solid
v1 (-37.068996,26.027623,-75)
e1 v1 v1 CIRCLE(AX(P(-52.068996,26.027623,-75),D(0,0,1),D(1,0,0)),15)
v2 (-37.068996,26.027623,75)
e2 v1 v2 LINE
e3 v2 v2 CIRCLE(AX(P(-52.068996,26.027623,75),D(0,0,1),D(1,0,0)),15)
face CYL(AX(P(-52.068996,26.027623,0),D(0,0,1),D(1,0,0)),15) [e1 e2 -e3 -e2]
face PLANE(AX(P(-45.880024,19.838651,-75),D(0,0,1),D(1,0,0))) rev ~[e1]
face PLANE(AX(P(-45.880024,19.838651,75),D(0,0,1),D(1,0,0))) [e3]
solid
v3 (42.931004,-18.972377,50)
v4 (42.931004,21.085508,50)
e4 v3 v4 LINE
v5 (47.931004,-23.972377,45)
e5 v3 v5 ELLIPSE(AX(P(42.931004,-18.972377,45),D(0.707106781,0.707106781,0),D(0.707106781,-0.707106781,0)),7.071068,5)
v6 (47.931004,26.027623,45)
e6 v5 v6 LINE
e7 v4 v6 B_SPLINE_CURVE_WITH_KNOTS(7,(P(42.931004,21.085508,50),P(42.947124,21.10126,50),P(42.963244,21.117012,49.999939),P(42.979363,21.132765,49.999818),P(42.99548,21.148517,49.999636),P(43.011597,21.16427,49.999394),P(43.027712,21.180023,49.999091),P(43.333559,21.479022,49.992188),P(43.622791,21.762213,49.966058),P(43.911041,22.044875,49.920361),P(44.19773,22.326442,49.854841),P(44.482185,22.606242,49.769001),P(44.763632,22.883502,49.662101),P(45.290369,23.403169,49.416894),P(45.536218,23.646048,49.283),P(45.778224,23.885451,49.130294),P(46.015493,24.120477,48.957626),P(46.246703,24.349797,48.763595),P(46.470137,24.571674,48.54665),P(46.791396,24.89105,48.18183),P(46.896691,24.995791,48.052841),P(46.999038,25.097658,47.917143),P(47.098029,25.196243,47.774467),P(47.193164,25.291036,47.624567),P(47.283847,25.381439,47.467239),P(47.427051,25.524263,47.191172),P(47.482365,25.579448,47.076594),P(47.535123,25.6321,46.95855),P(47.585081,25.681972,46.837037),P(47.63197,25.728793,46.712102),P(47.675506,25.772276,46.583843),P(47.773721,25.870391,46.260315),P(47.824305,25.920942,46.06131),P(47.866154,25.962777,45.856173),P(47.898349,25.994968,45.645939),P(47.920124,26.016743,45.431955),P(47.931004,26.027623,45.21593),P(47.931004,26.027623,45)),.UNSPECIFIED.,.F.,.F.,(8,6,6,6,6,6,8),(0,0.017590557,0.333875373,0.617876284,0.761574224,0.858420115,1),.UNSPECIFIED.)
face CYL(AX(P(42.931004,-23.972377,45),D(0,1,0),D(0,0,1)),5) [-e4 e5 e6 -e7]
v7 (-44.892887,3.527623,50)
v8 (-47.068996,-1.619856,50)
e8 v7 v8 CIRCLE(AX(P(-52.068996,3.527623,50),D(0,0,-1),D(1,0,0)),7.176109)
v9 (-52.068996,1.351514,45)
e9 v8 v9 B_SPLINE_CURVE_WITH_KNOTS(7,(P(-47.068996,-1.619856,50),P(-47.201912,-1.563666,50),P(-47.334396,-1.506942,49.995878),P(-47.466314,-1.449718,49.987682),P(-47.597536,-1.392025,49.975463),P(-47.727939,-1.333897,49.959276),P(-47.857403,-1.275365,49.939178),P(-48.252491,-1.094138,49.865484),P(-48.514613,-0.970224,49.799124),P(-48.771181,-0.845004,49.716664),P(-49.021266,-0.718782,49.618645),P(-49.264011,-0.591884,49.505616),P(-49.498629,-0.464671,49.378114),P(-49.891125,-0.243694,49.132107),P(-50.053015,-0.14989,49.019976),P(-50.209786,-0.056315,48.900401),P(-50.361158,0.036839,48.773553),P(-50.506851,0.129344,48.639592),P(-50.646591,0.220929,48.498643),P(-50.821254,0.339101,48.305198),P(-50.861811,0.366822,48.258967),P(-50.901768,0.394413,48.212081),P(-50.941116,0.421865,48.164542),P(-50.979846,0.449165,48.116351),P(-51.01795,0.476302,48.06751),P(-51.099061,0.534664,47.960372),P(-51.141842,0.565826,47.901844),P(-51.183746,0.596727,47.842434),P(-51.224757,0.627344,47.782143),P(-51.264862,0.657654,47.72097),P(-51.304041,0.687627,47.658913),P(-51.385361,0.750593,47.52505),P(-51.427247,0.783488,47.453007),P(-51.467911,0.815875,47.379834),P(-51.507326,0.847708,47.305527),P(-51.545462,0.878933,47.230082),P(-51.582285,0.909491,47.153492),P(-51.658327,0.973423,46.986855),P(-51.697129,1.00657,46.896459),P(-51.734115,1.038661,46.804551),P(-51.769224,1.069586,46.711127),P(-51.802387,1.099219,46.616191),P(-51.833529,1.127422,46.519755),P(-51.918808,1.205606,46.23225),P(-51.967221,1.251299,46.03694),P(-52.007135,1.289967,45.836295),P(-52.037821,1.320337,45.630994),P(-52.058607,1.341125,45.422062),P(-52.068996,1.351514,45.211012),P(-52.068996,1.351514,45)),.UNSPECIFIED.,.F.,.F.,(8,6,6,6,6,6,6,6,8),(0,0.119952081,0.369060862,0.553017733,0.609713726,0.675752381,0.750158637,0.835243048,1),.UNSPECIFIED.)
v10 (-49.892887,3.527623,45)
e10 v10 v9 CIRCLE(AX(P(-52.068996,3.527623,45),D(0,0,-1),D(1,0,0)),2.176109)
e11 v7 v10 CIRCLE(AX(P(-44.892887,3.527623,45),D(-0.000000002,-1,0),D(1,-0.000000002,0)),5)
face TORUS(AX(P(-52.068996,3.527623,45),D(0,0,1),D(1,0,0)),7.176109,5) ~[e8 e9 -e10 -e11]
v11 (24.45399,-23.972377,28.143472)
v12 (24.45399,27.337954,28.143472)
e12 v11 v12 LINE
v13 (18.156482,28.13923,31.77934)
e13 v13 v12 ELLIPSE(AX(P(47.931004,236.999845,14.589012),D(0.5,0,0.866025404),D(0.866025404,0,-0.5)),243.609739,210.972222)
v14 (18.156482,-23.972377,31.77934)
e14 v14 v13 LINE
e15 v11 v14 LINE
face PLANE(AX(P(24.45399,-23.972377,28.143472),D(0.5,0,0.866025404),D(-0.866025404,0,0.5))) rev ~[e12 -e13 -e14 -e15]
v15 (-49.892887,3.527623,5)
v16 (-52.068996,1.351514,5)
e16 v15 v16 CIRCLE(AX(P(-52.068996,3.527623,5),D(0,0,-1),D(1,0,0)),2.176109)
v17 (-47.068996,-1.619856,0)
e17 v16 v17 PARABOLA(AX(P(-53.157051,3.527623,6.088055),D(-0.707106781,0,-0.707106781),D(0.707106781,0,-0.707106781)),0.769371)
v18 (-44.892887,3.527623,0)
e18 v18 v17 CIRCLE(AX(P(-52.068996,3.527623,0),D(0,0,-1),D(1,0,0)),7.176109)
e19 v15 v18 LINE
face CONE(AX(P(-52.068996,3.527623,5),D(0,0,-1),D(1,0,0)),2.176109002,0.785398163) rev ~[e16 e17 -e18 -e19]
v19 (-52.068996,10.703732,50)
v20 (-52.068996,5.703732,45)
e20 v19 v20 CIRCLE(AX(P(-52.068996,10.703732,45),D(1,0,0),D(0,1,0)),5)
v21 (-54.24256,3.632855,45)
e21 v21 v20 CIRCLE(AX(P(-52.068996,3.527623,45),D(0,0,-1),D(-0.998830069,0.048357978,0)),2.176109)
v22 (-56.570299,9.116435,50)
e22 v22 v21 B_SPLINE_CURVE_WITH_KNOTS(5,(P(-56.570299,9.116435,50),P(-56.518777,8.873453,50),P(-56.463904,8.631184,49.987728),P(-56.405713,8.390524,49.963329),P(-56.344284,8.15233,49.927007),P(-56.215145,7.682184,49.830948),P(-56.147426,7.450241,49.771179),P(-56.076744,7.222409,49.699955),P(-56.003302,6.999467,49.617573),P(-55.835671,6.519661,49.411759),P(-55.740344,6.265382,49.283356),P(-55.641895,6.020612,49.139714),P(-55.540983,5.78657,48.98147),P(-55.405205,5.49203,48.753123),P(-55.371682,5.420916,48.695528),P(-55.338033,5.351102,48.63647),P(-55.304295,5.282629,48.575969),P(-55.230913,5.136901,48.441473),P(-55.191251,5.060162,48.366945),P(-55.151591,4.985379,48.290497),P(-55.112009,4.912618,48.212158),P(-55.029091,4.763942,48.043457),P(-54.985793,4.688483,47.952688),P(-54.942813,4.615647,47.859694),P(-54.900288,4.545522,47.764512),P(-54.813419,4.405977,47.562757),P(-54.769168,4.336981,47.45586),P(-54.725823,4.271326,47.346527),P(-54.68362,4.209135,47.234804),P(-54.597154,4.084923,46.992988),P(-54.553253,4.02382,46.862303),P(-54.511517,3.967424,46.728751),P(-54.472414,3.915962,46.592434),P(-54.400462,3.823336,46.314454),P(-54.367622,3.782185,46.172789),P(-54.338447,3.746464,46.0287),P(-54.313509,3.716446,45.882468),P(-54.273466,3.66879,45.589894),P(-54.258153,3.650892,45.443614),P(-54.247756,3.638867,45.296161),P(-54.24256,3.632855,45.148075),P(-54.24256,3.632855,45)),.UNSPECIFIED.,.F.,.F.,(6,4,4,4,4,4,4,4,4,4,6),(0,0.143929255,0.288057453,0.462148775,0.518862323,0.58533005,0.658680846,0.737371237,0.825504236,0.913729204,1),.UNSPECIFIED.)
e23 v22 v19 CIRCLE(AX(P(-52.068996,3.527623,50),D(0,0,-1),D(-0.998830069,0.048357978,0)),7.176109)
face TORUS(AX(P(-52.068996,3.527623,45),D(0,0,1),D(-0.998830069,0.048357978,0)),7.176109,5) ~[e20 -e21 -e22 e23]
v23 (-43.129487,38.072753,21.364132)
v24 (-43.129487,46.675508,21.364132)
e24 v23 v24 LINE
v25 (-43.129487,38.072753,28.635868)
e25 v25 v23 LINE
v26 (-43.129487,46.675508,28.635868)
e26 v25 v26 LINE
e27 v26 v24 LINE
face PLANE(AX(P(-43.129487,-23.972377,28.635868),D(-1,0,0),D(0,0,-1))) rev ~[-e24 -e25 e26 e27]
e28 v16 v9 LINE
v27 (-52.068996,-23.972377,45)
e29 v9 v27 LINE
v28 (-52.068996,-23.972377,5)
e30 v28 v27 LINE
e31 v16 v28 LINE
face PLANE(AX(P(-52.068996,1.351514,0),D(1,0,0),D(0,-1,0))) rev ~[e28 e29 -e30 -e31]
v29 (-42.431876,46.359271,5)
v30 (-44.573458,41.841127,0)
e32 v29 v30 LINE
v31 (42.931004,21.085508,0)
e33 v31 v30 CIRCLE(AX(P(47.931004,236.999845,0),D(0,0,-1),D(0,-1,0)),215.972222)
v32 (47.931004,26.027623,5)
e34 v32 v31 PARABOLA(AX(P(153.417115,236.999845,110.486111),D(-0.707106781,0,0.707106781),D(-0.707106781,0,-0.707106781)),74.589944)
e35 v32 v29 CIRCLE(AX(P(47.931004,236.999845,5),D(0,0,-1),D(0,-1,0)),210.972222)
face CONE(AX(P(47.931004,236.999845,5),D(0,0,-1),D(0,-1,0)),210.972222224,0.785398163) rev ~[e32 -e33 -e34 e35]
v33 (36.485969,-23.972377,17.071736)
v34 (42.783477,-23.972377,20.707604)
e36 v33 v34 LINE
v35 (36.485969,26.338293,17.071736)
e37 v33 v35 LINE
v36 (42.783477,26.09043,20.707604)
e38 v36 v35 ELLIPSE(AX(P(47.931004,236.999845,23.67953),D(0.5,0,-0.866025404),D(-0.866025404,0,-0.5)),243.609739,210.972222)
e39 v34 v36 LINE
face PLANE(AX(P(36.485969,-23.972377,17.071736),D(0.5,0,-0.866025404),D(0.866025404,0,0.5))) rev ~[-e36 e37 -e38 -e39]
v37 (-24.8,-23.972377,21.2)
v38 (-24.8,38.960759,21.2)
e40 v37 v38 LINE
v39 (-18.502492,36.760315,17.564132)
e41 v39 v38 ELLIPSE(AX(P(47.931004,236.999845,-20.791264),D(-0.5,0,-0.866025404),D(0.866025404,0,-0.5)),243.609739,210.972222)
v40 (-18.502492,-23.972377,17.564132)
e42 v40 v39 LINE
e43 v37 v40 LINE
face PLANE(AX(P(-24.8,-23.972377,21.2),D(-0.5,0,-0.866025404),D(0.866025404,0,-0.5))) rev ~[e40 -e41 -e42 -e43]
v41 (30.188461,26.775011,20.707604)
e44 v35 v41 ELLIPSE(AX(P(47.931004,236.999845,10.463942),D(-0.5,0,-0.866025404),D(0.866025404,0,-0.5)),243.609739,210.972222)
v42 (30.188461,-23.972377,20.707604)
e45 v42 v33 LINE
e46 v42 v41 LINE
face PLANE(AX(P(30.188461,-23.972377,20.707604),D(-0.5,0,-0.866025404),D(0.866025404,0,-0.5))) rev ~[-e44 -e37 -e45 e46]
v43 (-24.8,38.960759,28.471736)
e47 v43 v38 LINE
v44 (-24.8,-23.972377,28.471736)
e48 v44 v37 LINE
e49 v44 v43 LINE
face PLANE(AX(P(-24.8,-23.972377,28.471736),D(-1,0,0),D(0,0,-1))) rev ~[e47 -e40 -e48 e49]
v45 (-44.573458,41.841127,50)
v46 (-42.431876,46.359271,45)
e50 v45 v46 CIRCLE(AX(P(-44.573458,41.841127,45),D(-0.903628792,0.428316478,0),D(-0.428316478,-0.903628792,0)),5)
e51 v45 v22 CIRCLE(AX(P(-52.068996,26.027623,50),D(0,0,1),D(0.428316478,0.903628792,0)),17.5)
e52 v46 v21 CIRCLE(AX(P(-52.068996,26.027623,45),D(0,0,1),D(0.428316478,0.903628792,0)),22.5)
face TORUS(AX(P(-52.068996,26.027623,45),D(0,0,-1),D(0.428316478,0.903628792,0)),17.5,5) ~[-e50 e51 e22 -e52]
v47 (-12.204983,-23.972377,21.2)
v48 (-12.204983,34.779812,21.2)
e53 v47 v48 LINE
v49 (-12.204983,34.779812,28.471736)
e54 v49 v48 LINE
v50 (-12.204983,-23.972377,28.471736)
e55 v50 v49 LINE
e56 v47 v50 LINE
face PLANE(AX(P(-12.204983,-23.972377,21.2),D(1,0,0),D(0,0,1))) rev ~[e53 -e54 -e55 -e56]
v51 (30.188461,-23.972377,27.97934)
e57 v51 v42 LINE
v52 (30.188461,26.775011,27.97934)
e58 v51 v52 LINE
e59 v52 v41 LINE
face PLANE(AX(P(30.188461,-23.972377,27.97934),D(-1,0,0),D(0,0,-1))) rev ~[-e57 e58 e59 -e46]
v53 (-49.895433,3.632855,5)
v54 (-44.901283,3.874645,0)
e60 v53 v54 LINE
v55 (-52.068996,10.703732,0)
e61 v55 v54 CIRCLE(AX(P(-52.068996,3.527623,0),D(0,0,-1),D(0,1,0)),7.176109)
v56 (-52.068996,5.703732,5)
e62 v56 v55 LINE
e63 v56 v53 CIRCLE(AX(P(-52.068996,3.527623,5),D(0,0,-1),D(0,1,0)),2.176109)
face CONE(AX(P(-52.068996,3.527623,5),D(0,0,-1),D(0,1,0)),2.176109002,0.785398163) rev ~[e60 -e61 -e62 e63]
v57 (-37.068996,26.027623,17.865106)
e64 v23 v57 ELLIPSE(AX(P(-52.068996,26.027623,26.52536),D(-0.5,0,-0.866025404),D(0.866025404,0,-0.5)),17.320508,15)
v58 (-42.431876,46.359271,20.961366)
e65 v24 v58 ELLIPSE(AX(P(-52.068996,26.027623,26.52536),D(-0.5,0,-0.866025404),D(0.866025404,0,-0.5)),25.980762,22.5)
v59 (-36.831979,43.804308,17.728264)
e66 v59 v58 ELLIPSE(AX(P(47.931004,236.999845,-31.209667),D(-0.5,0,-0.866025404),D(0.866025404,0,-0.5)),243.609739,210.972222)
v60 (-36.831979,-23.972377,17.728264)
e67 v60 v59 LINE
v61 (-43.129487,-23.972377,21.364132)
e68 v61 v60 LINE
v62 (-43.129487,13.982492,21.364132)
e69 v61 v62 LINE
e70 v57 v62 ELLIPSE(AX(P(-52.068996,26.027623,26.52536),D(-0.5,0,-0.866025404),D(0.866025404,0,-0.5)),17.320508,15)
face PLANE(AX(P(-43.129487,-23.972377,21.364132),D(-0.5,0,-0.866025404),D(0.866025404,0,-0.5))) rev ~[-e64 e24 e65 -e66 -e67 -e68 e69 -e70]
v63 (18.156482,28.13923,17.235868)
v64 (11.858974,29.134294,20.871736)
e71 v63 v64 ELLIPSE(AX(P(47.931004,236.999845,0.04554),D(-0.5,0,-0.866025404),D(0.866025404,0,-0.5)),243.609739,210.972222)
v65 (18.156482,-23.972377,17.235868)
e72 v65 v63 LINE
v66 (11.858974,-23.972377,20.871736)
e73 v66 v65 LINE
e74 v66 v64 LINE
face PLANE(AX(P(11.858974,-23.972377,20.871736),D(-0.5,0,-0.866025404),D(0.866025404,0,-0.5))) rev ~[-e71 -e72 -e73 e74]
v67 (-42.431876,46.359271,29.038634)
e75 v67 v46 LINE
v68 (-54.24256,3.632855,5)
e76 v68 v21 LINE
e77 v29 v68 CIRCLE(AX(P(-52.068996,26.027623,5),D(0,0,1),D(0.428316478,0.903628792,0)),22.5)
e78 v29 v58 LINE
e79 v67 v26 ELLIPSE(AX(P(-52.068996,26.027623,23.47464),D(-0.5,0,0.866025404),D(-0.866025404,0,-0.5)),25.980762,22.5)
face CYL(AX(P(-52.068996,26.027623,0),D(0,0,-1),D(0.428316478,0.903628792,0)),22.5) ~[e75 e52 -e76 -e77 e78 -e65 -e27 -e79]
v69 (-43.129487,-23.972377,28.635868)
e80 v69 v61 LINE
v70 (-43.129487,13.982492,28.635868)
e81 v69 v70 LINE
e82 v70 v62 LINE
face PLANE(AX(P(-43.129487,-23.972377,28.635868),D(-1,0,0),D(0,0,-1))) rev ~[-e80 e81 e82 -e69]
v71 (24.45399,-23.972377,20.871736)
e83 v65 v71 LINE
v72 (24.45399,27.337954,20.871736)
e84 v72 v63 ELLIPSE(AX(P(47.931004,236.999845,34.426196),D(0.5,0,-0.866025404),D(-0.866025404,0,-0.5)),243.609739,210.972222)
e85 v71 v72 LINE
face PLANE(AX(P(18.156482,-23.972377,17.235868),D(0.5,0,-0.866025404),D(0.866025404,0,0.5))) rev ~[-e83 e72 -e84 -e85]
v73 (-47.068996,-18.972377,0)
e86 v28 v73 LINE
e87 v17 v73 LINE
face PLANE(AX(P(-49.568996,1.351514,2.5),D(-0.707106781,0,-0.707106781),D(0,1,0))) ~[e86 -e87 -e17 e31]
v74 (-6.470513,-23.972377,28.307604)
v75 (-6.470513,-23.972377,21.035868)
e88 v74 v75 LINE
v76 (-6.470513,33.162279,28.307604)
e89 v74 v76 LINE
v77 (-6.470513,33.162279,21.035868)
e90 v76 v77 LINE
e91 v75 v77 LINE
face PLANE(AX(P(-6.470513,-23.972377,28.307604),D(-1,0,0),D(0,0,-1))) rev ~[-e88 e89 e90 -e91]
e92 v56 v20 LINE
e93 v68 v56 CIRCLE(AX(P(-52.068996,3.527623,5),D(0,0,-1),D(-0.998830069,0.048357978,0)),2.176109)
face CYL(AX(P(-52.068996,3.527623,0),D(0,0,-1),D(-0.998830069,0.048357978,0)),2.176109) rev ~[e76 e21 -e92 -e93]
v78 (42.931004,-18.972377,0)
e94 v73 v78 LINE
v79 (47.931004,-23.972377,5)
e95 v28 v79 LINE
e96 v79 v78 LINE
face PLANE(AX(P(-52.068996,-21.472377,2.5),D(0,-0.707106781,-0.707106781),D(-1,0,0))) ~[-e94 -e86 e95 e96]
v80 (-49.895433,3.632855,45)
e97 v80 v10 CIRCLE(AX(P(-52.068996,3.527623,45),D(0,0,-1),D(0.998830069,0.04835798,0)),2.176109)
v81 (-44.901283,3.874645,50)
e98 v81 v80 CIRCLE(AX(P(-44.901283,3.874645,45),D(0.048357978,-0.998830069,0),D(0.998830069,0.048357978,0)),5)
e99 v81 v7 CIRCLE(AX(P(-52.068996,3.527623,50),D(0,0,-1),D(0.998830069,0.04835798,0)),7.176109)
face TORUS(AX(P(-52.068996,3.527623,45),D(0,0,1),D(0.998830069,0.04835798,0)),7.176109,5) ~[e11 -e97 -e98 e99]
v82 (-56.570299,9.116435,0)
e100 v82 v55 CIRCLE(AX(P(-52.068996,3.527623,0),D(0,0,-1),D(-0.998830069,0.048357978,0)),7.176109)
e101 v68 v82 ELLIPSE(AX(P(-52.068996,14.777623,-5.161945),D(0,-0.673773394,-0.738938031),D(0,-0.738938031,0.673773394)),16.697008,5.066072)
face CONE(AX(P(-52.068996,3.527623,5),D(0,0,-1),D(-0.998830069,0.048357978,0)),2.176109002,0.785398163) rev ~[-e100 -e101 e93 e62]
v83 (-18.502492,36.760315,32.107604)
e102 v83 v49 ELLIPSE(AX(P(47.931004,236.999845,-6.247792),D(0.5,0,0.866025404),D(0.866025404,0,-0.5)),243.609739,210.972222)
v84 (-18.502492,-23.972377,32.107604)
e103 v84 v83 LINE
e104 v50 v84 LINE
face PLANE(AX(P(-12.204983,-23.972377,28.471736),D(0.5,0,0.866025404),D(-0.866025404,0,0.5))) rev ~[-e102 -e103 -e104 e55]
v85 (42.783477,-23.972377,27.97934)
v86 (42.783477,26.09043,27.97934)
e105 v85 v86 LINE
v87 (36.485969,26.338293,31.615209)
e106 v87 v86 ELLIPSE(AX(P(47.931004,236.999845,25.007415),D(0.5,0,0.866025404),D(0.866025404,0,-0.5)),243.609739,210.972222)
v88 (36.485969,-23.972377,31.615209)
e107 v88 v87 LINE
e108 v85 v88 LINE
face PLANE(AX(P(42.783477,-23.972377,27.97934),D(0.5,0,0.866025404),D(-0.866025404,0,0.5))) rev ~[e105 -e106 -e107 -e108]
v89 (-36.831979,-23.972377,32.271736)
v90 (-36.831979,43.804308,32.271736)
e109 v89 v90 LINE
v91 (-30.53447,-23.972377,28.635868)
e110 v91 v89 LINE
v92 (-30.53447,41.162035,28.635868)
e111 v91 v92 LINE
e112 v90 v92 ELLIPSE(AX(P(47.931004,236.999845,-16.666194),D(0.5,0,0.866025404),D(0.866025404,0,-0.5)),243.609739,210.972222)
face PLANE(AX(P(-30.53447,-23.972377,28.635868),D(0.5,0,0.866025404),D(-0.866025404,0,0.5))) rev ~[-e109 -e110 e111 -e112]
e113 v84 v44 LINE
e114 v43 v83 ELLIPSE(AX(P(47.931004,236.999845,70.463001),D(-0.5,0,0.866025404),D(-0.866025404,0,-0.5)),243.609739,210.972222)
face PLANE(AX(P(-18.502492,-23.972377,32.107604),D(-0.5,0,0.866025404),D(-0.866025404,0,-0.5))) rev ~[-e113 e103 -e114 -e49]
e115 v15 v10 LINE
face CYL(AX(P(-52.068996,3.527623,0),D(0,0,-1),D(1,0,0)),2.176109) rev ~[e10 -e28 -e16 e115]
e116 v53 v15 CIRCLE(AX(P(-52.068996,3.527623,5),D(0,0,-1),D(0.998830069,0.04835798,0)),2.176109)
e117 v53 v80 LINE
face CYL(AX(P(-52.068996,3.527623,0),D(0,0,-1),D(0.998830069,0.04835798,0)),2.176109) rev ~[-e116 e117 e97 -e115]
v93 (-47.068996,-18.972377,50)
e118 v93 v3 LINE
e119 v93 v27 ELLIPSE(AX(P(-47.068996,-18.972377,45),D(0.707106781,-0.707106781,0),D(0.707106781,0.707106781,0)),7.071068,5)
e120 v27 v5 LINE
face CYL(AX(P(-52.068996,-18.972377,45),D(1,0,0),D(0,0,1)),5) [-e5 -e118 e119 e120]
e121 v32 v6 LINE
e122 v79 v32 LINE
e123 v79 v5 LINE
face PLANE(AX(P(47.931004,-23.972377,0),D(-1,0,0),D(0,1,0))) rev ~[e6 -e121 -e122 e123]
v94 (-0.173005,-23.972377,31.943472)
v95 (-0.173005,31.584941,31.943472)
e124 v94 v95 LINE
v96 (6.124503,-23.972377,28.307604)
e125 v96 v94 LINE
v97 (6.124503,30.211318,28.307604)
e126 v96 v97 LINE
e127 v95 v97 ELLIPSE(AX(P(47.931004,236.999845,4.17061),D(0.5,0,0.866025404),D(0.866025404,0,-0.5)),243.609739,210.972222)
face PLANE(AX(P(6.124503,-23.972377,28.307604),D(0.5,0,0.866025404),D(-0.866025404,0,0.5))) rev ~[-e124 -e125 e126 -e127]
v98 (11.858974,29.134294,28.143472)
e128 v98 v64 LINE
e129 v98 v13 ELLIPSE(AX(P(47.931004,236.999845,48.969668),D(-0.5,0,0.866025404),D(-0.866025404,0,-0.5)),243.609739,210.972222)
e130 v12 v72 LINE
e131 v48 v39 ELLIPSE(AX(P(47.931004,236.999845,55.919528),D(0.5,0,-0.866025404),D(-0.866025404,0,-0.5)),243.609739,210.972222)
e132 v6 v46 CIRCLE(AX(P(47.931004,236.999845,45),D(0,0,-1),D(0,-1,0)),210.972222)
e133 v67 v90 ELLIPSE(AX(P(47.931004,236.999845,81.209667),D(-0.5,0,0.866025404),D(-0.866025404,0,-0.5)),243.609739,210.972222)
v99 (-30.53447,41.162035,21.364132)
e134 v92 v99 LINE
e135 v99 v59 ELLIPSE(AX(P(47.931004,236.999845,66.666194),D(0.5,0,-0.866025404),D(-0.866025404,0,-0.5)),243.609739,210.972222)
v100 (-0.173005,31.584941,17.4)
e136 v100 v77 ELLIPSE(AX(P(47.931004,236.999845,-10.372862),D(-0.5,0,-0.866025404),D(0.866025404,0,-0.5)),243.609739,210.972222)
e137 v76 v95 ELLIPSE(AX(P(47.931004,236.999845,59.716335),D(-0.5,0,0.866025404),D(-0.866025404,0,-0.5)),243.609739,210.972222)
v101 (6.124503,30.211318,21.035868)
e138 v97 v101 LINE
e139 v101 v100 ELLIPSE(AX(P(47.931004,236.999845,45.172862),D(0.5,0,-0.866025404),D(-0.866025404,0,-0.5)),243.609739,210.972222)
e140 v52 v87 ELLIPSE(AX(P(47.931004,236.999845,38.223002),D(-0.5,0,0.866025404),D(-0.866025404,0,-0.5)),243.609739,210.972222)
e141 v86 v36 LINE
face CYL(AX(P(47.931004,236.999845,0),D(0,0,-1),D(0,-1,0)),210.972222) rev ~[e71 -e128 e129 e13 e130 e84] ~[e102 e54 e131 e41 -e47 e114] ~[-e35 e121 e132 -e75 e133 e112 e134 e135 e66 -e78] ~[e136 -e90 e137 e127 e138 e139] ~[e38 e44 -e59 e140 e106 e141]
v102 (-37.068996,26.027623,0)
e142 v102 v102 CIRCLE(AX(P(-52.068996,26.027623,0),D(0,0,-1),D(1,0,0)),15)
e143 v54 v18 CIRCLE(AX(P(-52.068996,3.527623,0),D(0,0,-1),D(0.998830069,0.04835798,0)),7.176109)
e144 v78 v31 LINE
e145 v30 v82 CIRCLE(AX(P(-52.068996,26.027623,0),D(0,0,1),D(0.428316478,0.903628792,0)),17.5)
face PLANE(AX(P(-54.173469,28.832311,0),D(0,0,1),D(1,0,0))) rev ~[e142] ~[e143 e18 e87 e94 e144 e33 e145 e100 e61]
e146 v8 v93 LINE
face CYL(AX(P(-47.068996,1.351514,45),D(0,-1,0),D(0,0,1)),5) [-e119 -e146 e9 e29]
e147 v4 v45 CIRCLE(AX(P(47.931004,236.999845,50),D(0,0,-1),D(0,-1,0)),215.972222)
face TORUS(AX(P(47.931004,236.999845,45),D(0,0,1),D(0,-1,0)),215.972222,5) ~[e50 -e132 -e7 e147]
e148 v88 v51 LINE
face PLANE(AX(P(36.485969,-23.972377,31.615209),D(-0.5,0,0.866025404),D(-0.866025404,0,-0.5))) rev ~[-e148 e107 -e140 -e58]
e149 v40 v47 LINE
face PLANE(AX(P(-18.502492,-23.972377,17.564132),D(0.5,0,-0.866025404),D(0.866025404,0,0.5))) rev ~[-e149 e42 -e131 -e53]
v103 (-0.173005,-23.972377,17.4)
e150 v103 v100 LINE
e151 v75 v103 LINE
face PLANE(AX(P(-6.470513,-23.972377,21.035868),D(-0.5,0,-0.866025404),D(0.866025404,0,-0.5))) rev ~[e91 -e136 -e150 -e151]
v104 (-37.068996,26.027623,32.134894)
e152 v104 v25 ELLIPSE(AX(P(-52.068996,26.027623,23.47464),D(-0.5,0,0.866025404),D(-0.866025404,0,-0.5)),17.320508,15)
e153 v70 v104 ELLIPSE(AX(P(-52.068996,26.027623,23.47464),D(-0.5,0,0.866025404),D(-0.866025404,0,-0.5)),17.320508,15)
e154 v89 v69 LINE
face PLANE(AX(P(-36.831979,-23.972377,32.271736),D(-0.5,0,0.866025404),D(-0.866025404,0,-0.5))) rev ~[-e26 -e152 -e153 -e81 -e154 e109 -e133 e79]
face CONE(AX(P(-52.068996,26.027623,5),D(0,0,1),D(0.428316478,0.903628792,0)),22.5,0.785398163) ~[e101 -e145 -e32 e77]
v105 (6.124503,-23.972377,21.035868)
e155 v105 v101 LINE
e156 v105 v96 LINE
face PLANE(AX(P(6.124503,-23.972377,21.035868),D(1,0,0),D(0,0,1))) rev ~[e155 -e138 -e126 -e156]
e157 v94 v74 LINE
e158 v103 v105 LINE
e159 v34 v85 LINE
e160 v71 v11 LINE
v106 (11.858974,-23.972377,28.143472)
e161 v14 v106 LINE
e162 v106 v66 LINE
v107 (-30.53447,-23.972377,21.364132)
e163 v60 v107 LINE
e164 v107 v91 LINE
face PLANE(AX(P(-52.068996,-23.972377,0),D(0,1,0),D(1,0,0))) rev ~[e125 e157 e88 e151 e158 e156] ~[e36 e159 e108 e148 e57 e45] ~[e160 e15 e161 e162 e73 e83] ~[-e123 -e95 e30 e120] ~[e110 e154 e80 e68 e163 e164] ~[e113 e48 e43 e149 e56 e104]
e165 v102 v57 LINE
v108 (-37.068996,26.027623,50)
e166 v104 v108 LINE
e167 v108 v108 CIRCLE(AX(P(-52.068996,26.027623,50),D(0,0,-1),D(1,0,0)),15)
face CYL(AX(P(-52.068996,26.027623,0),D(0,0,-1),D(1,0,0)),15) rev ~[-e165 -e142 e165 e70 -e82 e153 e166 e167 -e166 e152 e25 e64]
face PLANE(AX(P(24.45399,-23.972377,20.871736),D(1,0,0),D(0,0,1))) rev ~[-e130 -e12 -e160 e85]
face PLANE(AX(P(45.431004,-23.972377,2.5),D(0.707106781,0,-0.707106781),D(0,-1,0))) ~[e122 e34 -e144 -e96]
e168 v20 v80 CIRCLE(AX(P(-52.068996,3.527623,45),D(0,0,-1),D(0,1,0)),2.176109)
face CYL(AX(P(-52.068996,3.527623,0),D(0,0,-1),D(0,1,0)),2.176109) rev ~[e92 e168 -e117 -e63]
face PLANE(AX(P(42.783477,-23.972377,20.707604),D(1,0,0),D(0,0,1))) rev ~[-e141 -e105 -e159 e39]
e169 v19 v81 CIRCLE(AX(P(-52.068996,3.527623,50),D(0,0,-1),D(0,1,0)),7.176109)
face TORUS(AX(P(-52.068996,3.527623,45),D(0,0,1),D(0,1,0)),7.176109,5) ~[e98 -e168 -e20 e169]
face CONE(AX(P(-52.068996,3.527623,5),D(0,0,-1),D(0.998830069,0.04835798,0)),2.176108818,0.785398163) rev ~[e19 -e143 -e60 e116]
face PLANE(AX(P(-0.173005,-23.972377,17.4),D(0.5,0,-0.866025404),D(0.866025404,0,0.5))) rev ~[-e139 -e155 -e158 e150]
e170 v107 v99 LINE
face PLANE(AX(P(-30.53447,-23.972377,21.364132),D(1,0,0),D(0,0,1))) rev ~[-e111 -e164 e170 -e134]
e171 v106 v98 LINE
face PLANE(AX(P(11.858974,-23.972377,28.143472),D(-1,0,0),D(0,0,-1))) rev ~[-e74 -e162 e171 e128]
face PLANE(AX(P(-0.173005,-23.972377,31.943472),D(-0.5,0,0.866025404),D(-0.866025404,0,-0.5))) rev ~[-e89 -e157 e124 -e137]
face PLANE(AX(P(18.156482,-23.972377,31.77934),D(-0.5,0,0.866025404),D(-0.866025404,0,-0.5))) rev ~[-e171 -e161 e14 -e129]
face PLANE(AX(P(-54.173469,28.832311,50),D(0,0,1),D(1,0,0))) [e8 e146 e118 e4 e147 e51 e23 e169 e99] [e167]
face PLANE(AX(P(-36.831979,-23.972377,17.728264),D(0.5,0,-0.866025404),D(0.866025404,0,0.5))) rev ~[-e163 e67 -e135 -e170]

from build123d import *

# Parameters (mm, degrees)
F1_DEPTH = 50
F2_DEPTH = 75
F4_DEPTH = 72.501
F5_R     = 5
F6_SIZE  = 5


with BuildPart() as f1:
    # F0 (on Top) → F1 (new body)
    with BuildSketch(Plane.XY):
        with BuildLine():
            ThreePointArc((-52.0689964294, 11.0276228632), (-62.6755981472, 36.634224581), (-37.0689964294, 26.0276228632))
            Line((-37.0689964294, 26.0276228632), (-29.5689964294, 26.0276228632))
            ThreePointArc((-29.5689964294, 26.0276228632), (-33.0547226183, 38.0570613968), (-42.431875668, 46.3592706919))
            ThreePointArc((-42.431875668, 46.3592706919), (-73.7556932891, 32.0223855205), (-54.2425595338, 3.6328550942))
            ThreePointArc((-54.2425595338, 3.6328550942), (-53.5700716418, 5.103130273), (-52.0689964294, 5.7037318658))
            Line((-52.0689964294, 5.7037318658), (-52.0689964294, 11.0276228632))
        make_face()
        with BuildLine():
            Line((-29.5689964294, 26.0276228632), (-37.0689964294, 26.0276228632))
            ThreePointArc((-37.0689964294, 26.0276228632), (-41.4623947116, 15.4210211454), (-52.0689964294, 11.0276228632))
            Line((-52.0689964294, 11.0276228632), (-52.0689964294, 5.7037318658))
            ThreePointArc((-52.0689964294, 5.7037318658), (-50.5679212171, 5.103130273), (-49.8954333251, 3.6328550942))
            ThreePointArc((-49.8954333251, 3.6328550942), (-35.4083366309, 10.905704497), (-29.5689964294, 26.0276228632))
        make_face()
        with BuildLine():
            ThreePointArc((-42.431875668, 46.3592706919), (-33.0547226183, 38.0570613968), (-29.5689964294, 26.0276228632))
            Line((-29.5689964294, 26.0276228632), (47.9310035706, 26.0276228632))
            ThreePointArc((47.9310035706, 26.0276228632), (1.6200279608, 31.1732868199), (-42.431875668, 46.3592706919))
        make_face()
        with BuildLine():
            Line((47.9310035706, 26.0276228632), (-29.5689964294, 26.0276228632))
            ThreePointArc((-29.5689964294, 26.0276228632), (-35.4083366309, 10.905704497), (-49.8954333251, 3.6328550942))
            ThreePointArc((-49.8954333251, 3.6328550942), (-49.8935239945, 3.5802543748), (-49.8928874269, 3.5276228632))
            ThreePointArc((-49.8928874269, 3.5276228632), (-50.5302549971, 1.9888814309), (-52.0689964294, 1.3515138607))
            Line((-52.0689964294, 1.3515138607), (-52.0689964294, -23.9723771368))
            Line((-52.0689964294, -23.9723771368), (47.9310035706, -23.9723771368))
            Line((47.9310035706, -23.9723771368), (47.9310035706, 26.0276228632))
        make_face()
    extrude(amount=F1_DEPTH)

    # F3 (on face) → F4 (cut, through all)
    with BuildSketch(Plane.XZ.offset(23.9723771368)):
        Polygon((-30.5344704539, 21.364131914), (-30.5344704539, 28.635868086), (-36.8319787085, 32.2717361721), (-43.1294869632, 28.635868086), (-43.1294869632, 21.364131914), (-36.8319787085, 17.7282638279), align=None)
        Polygon((-18.5024917454, 32.1076042581), (-24.8, 28.4717361721), (-24.8, 21.2), (-18.5024917454, 17.564131914), (-12.2049834907, 21.2), (-12.2049834907, 28.4717361721), align=None)
        Polygon((-0.1730047822, 31.9434723442), (-6.4705130368, 28.3076042581), (-6.4705130368, 21.035868086), (-0.1730047822, 17.4), (6.1245034724, 21.035868086), (6.1245034724, 28.3076042581), align=None)
        Polygon((18.156482181, 31.7793404302), (11.8589739263, 28.1434723442), (11.8589739263, 20.8717361721), (18.156482181, 17.235868086), (24.4539904356, 20.8717361721), (24.4539904356, 28.1434723442), align=None)
        Polygon((36.4859691441, 31.6152085163), (30.1884608895, 27.9793404302), (30.1884608895, 20.7076042581), (36.4859691441, 17.0717361721), (42.7834773988, 20.7076042581), (42.7834773988, 27.9793404302), align=None)
    extrude(amount=-F4_DEPTH, mode=Mode.SUBTRACT)

    # F5
    f5_edges = [f1.edges().sort_by_distance(p)[0] for p in [
        (-2.068996, -23.972377, 50),
        (47.931004, 1.027623, 50),
        (1.620028, 31.173287, 50),
        (-73.755693, 32.022386, 50),
        (-52.068996, -11.310432, 50),
        (-50.493489, 5.028698, 50),
    ]]
    fillet(f5_edges, radius=F5_R)

    # F6
    f6_edges = [f1.edges().sort_by_distance(p)[0] for p in [
        (-2.068996, -23.972377, 0),
        (47.931004, 1.027623, 0),
        (1.620028, 31.173287, 0),
        (-73.755693, 32.022386, 0),
        (-50.493489, 5.028698, 0),
        (-52.068996, -11.310432, 0),
    ]]
    chamfer(f6_edges, length=F6_SIZE)


with BuildPart() as f2:
    # F0 (on Top) → F2 (new body, symmetric)
    with BuildSketch(Plane.XY):
        with BuildLine():
            Line((-37.0689964294, 26.0276228632), (-52.0689964294, 26.0276228632))
            Line((-52.0689964294, 26.0276228632), (-52.0689964294, 11.0276228632))
            ThreePointArc((-52.0689964294, 11.0276228632), (-41.4623947116, 15.4210211454), (-37.0689964294, 26.0276228632))
        make_face()
        with BuildLine():
            Line((-52.0689964294, 11.0276228632), (-52.0689964294, 26.0276228632))
            Line((-52.0689964294, 26.0276228632), (-37.0689964294, 26.0276228632))
            ThreePointArc((-37.0689964294, 26.0276228632), (-62.6755981472, 36.634224581), (-52.0689964294, 11.0276228632))
        make_face()
    extrude(amount=F2_DEPTH, both=True)


solid = Compound([f1.part, f2.part])
